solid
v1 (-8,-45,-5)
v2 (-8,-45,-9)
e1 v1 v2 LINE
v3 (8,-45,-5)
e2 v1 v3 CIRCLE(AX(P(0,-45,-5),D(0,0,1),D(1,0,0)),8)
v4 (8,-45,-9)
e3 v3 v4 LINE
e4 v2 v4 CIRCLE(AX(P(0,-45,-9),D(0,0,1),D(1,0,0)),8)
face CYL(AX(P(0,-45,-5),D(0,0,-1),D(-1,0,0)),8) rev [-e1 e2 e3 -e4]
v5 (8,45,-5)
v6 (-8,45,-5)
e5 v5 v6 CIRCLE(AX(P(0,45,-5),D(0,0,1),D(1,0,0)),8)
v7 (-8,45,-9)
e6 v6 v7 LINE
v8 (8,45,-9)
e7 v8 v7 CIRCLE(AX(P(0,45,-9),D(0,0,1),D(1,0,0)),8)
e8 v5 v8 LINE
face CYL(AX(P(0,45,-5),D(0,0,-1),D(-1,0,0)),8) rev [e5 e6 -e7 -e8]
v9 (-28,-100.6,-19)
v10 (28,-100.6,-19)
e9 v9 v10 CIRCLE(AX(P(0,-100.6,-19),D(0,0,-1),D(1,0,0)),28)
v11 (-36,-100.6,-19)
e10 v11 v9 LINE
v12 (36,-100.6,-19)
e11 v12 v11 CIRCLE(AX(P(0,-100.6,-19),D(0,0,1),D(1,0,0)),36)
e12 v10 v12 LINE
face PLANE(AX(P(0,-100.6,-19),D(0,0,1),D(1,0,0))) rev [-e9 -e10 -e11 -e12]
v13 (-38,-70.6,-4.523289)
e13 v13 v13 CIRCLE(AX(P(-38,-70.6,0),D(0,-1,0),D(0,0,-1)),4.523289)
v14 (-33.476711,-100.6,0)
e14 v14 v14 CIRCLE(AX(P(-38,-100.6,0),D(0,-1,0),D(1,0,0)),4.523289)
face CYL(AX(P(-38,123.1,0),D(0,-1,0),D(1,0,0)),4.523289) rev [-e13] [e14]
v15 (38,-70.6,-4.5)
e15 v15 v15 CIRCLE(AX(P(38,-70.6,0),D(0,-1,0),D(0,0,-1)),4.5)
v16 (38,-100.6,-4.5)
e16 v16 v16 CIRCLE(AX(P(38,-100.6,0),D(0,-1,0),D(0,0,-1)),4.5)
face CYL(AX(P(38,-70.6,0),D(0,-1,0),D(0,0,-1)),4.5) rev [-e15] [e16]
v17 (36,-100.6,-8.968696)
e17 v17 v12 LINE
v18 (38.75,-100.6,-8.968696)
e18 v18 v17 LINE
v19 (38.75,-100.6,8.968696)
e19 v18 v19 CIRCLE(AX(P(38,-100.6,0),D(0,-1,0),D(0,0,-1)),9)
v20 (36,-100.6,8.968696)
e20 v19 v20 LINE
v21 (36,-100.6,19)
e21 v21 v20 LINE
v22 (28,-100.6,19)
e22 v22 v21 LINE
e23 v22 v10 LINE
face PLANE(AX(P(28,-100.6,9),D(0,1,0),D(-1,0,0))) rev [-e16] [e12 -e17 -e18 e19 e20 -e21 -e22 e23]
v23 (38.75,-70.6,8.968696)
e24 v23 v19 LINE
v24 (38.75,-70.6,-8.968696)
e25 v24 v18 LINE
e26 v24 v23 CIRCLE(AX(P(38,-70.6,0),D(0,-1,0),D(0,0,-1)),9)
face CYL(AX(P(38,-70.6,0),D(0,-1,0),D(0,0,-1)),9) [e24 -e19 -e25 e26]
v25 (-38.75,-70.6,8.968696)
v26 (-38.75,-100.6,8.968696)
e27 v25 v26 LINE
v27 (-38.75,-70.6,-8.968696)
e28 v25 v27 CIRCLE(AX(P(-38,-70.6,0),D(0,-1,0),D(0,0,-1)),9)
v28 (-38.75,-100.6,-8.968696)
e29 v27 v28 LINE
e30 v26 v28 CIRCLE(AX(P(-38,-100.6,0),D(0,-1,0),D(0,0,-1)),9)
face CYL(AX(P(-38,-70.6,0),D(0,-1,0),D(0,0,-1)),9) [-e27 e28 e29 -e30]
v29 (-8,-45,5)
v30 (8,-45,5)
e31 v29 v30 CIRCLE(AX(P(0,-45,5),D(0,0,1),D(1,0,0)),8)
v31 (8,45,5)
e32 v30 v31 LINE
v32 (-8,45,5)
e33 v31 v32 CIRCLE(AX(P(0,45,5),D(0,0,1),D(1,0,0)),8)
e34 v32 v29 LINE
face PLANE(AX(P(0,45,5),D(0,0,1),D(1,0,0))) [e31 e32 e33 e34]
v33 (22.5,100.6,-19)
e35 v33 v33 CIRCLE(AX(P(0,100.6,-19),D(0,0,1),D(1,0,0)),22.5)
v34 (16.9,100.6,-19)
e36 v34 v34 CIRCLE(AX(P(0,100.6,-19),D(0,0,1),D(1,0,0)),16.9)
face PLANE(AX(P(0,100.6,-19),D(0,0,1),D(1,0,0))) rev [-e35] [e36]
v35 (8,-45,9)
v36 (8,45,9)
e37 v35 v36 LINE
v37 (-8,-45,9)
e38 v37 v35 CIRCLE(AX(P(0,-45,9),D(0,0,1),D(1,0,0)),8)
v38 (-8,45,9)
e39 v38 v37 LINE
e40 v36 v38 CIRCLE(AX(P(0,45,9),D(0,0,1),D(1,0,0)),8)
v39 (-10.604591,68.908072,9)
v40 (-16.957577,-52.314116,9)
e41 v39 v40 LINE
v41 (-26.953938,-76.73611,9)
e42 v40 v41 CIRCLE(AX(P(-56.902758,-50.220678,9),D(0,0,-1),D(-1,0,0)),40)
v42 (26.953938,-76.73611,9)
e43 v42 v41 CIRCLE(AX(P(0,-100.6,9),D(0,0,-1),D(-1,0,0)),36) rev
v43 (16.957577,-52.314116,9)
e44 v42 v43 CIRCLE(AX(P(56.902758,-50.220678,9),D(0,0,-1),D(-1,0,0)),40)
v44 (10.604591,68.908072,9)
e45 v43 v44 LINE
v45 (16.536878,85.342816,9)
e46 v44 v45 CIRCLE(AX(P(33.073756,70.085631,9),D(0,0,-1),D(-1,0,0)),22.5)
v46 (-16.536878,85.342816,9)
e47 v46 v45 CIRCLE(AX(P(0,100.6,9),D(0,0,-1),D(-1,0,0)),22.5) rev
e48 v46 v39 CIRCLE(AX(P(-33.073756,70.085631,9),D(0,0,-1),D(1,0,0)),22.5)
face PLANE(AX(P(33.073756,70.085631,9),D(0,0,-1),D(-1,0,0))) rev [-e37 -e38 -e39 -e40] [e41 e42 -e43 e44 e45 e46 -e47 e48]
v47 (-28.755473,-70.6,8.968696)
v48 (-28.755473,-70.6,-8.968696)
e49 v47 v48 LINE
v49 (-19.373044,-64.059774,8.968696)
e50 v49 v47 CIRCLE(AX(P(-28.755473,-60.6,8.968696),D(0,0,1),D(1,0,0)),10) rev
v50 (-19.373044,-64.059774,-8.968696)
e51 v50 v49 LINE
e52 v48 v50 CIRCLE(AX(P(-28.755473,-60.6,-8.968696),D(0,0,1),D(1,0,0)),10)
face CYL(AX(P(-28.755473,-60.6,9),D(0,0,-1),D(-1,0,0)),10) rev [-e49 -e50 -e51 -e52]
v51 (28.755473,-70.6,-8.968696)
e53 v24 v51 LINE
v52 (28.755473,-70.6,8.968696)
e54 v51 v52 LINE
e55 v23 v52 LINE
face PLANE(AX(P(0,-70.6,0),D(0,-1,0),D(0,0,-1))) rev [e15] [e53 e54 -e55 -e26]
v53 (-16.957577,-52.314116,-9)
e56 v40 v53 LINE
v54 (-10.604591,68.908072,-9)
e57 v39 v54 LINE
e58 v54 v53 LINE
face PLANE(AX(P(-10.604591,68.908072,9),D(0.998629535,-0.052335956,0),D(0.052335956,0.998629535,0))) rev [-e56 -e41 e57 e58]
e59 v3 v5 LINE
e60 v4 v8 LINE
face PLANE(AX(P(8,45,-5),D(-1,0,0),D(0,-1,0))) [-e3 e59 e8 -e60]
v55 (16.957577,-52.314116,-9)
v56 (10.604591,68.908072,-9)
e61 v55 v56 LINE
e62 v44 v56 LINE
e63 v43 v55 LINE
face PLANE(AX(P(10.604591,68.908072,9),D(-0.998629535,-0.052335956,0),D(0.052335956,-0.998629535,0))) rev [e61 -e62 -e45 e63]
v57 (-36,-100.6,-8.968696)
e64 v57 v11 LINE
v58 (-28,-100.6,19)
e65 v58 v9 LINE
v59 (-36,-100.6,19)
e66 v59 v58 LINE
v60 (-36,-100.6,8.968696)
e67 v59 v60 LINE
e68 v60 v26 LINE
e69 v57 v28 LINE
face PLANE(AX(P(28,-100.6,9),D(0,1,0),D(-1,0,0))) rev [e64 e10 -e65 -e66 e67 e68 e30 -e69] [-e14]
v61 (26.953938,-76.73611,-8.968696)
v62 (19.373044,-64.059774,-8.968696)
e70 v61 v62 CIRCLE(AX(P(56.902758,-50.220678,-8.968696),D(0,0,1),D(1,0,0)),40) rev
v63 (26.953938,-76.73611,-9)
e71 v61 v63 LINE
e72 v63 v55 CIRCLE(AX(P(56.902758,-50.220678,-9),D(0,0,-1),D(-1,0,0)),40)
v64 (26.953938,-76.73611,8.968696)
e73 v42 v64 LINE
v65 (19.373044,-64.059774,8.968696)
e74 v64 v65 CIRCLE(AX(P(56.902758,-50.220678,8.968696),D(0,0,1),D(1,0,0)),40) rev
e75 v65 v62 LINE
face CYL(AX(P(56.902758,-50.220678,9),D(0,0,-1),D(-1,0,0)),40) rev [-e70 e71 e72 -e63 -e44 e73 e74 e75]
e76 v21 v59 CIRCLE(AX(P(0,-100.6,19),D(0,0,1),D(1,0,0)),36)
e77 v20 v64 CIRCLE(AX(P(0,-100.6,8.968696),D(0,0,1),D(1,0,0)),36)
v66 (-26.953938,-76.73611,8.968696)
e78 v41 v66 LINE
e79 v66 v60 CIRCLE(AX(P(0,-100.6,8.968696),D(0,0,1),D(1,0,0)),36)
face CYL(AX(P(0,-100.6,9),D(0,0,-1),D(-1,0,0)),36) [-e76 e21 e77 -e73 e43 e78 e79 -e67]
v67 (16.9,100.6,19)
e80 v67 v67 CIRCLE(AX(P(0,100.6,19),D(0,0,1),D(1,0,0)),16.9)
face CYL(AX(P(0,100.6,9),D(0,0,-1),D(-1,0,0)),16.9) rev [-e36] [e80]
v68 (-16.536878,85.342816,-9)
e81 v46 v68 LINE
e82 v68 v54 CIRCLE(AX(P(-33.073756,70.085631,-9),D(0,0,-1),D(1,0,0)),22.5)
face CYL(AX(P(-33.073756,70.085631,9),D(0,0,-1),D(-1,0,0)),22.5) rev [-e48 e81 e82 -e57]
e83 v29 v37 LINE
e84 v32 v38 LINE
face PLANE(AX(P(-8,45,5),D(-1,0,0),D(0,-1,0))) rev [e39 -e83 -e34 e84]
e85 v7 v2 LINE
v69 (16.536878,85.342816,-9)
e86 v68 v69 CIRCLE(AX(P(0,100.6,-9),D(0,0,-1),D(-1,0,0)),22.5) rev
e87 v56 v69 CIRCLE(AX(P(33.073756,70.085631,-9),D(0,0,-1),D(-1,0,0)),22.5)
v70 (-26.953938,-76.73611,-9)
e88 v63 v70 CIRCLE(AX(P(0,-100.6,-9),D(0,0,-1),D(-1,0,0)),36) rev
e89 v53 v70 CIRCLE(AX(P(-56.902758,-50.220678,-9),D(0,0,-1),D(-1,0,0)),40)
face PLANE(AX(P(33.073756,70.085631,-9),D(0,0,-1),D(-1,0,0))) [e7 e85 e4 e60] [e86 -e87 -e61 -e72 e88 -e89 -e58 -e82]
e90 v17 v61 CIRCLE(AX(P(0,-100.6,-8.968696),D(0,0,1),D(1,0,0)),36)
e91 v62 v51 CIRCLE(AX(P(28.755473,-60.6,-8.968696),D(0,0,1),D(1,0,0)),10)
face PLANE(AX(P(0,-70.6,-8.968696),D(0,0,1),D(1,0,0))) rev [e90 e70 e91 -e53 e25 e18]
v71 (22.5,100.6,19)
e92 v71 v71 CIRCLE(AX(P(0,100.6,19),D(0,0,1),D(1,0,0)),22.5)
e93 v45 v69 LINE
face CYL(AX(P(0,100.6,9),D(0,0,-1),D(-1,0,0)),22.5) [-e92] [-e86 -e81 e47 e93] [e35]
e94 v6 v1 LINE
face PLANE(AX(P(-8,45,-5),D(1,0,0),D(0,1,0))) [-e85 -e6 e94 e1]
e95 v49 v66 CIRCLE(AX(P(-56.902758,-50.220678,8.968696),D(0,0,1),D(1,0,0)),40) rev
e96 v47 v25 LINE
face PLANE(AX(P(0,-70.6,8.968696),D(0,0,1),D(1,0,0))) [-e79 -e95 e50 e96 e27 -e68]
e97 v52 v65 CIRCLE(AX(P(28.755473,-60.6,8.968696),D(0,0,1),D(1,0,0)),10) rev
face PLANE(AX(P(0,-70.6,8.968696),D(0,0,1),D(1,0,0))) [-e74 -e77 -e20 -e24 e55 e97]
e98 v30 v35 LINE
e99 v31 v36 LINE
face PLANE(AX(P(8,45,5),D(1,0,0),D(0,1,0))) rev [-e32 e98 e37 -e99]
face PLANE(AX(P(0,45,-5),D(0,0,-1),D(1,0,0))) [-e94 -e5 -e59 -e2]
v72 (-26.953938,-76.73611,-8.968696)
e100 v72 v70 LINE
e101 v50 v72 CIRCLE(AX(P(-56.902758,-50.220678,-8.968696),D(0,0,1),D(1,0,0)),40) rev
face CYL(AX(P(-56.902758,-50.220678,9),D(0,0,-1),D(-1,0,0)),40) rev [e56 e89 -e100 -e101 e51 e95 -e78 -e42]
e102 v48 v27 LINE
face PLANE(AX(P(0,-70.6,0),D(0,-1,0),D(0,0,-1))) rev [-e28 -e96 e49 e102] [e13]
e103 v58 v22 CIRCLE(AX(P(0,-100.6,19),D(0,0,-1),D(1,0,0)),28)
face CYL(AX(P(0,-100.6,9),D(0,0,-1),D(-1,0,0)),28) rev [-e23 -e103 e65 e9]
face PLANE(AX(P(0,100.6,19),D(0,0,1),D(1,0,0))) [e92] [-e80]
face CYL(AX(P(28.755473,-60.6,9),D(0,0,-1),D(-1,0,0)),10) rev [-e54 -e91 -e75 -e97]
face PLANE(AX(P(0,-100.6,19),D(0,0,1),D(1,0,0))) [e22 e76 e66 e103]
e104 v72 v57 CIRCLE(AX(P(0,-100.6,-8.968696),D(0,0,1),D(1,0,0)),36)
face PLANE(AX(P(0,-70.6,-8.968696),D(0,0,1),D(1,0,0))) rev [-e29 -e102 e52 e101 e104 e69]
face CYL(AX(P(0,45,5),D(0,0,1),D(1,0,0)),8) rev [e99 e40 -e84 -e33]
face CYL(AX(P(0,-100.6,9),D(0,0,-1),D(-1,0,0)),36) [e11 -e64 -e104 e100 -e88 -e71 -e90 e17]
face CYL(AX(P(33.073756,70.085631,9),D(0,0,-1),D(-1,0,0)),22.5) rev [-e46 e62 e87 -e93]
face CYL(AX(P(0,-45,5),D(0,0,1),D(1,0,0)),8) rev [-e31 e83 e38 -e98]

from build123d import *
from build123d.topology import SkipClean

# Parameters (mm, degrees)
SKETCH1_R           = 16.9
BOSS_EXTRUDE1_DEPTH = 9
SKETCH3_R           = 22.5
SKETCH3_R_2         = 16.9
BOSS_EXTRUDE2_DEPTH = 19
SKETCH4_R           = 4.5
BOSS_EXTRUDE3_DEPTH = 30
CUT_EXTRUDE2_DEPTH  = 4
CUT_EXTRUDE3_DEPTH  = 138.13719408
FILLET1_R           = 10
FILLET2_R           = 10
SKETCH7_R           = 4.523289267
SKETCH7_R_2         = 4.5
CUT_EXTRUDE4_DEPTH  = 230.372382819


with BuildPart() as part:
    # Sketch1 → Boss-Extrude1 (new, symmetric)
    with BuildSketch(Plane.XY):
        with BuildLine():
            Line((-10.60459099, 68.908072309), (-16.957576671, -52.314115855))
            ThreePointArc((-16.957576671, -52.314115855), (-19.883826234, -65.373191797), (-26.953938029, -76.736110444))
            ThreePointArc((-26.953938029, -76.736110444), (-33.66260365, -87.839548775), (-36, -100.6))
            Line((-36, -100.6), (-28, -100.6))
            ThreePointArc((-28, -100.6), (0, -72.6), (28, -100.6))
            Line((28, -100.6), (36, -100.6))
            ThreePointArc((36, -100.6), (33.66260365, -87.839548775), (26.953938029, -76.736110444))
            ThreePointArc((26.953938029, -76.736110444), (19.883826234, -65.373191797), (16.957576671, -52.314115855))
            Line((16.957576671, -52.314115855), (10.60459099, 68.908072309))
            ThreePointArc((10.60459099, 68.908072309), (11.910272087, 77.724804636), (16.536877761, 85.342815662))
            ThreePointArc((16.536877761, 85.342815662), (0, 123.1), (-16.536877761, 85.342815662))
            ThreePointArc((-16.536877761, 85.342815662), (-11.910272087, 77.724804636), (-10.60459099, 68.908072309))
        make_face()
        with Locations((0, 100.6)):
            Circle(SKETCH1_R, mode=Mode.SUBTRACT)
    extrude(amount=BOSS_EXTRUDE1_DEPTH, both=True)

    # Sketch3 → Boss-Extrude2 (add, symmetric)
    # profile 1 of 2: a face of its own
    with SkipClean():  # the faces are left unmerged after this step: merging them gives an invalid solid
        with BuildSketch(Plane.XY):
            with Locations((0, 100.6)):
                Circle(SKETCH3_R)
            with Locations((0, 100.6)):
                Circle(SKETCH3_R_2, mode=Mode.SUBTRACT)
        # profile 2 of 2: a face of its own
        with BuildSketch(Plane.XY):
            with BuildLine():
                Line((-28, -100.6), (-36, -100.6))
                ThreePointArc((-36, -100.6), (0, -64.6), (36, -100.6))
                Line((36, -100.6), (28, -100.6))
                ThreePointArc((28, -100.6), (0, -72.6), (-28, -100.6))
            make_face()
        extrude(amount=BOSS_EXTRUDE2_DEPTH, both=True)

    # Sketch4 → Boss-Extrude3 (add)
    with SkipClean():  # the faces are left unmerged after this step: merging them gives an invalid solid
        with BuildSketch(Plane.XZ.offset(100.6)):
            with BuildLine():
                Line((28, 8.968695557), (-28, 8.968695557))
                Line((-28, 8.968695557), (-38.75, 8.968695557))
                ThreePointArc((-38.75, 8.968695557), (-47, 0), (-38.75, -8.968695557))
                Line((-38.75, -8.968695557), (-28, -8.968695557))
                Line((-28, -8.968695557), (28, -8.968695557))
                Line((28, -8.968695557), (38.75, -8.968695557))
                ThreePointArc((38.75, -8.968695557), (47, 0), (38.75, 8.968695557))
                Line((38.75, 8.968695557), (28, 8.968695557))
            make_face()
            with Locations((-38, 0)):
                Circle(SKETCH4_R, mode=Mode.SUBTRACT)
            with Locations((38, 0)):
                Circle(SKETCH4_R, mode=Mode.SUBTRACT)
        extrude(amount=-BOSS_EXTRUDE3_DEPTH)

    # Sketch5 → Cut-Extrude2 (cut)
    with SkipClean():  # the faces are left unmerged after this step: merging them gives an invalid solid
        with BuildSketch(Plane.XY.offset(9)):
            with BuildLine():
                Line((-8, 45), (-8, -45))
                ThreePointArc((-8, -45), (0, -53), (8, -45))
                Line((8, -45), (8, 45))
                ThreePointArc((8, 45), (0, 53), (-8, 45))
            make_face()
        cut_extrude2 = extrude(amount=-CUT_EXTRUDE2_DEPTH, mode=Mode.SUBTRACT)

    # Mirror1: Cut-Extrude2 across plane
    with SkipClean():  # the faces are left unmerged after this step: merging them gives an invalid solid
        add(cut_extrude2.mirror(Plane.XY), mode=Mode.SUBTRACT)

    # Sketch6 → Cut-Extrude3 (cut, through all)
    with SkipClean():  # the faces are left unmerged after this step: merging them gives an invalid solid
        with BuildSketch(Plane.XY.offset(19)):
            with BuildLine():
                Line((28, -100.6), (-28, -100.6))
                ThreePointArc((-28, -100.6), (0, -72.6), (28, -100.6))
            make_face()
        extrude(amount=-CUT_EXTRUDE3_DEPTH, mode=Mode.SUBTRACT)

    # Fillet1
    fillet1_edges = [part.edges().sort_by_distance(p)[0] for p in [
        (22.483530605, -70.6, 0),
    ]]
    fillet(fillet1_edges, radius=FILLET1_R)

    # Fillet2
    fillet2_edges = [part.edges().sort_by_distance(p)[0] for p in [
        (-22.483530605, -70.6, 0),
    ]]
    fillet(fillet2_edges, radius=FILLET2_R)

    # Sketch7 → Cut-Extrude4 (cut, through all)
    with SkipClean():  # the faces are left unmerged after this step: merging them gives an invalid solid
        with BuildSketch(Plane.XZ.offset(100.6)):
            with Locations((-38, 0)):
                Circle(SKETCH7_R)
            with Locations((38, 0)):
                Circle(SKETCH7_R_2)
        extrude(amount=-CUT_EXTRUDE4_DEPTH, mode=Mode.SUBTRACT)
    add(part.part.scale(1), mode=Mode.REPLACE)  # the faces are merged on a copy


solid = part.part
